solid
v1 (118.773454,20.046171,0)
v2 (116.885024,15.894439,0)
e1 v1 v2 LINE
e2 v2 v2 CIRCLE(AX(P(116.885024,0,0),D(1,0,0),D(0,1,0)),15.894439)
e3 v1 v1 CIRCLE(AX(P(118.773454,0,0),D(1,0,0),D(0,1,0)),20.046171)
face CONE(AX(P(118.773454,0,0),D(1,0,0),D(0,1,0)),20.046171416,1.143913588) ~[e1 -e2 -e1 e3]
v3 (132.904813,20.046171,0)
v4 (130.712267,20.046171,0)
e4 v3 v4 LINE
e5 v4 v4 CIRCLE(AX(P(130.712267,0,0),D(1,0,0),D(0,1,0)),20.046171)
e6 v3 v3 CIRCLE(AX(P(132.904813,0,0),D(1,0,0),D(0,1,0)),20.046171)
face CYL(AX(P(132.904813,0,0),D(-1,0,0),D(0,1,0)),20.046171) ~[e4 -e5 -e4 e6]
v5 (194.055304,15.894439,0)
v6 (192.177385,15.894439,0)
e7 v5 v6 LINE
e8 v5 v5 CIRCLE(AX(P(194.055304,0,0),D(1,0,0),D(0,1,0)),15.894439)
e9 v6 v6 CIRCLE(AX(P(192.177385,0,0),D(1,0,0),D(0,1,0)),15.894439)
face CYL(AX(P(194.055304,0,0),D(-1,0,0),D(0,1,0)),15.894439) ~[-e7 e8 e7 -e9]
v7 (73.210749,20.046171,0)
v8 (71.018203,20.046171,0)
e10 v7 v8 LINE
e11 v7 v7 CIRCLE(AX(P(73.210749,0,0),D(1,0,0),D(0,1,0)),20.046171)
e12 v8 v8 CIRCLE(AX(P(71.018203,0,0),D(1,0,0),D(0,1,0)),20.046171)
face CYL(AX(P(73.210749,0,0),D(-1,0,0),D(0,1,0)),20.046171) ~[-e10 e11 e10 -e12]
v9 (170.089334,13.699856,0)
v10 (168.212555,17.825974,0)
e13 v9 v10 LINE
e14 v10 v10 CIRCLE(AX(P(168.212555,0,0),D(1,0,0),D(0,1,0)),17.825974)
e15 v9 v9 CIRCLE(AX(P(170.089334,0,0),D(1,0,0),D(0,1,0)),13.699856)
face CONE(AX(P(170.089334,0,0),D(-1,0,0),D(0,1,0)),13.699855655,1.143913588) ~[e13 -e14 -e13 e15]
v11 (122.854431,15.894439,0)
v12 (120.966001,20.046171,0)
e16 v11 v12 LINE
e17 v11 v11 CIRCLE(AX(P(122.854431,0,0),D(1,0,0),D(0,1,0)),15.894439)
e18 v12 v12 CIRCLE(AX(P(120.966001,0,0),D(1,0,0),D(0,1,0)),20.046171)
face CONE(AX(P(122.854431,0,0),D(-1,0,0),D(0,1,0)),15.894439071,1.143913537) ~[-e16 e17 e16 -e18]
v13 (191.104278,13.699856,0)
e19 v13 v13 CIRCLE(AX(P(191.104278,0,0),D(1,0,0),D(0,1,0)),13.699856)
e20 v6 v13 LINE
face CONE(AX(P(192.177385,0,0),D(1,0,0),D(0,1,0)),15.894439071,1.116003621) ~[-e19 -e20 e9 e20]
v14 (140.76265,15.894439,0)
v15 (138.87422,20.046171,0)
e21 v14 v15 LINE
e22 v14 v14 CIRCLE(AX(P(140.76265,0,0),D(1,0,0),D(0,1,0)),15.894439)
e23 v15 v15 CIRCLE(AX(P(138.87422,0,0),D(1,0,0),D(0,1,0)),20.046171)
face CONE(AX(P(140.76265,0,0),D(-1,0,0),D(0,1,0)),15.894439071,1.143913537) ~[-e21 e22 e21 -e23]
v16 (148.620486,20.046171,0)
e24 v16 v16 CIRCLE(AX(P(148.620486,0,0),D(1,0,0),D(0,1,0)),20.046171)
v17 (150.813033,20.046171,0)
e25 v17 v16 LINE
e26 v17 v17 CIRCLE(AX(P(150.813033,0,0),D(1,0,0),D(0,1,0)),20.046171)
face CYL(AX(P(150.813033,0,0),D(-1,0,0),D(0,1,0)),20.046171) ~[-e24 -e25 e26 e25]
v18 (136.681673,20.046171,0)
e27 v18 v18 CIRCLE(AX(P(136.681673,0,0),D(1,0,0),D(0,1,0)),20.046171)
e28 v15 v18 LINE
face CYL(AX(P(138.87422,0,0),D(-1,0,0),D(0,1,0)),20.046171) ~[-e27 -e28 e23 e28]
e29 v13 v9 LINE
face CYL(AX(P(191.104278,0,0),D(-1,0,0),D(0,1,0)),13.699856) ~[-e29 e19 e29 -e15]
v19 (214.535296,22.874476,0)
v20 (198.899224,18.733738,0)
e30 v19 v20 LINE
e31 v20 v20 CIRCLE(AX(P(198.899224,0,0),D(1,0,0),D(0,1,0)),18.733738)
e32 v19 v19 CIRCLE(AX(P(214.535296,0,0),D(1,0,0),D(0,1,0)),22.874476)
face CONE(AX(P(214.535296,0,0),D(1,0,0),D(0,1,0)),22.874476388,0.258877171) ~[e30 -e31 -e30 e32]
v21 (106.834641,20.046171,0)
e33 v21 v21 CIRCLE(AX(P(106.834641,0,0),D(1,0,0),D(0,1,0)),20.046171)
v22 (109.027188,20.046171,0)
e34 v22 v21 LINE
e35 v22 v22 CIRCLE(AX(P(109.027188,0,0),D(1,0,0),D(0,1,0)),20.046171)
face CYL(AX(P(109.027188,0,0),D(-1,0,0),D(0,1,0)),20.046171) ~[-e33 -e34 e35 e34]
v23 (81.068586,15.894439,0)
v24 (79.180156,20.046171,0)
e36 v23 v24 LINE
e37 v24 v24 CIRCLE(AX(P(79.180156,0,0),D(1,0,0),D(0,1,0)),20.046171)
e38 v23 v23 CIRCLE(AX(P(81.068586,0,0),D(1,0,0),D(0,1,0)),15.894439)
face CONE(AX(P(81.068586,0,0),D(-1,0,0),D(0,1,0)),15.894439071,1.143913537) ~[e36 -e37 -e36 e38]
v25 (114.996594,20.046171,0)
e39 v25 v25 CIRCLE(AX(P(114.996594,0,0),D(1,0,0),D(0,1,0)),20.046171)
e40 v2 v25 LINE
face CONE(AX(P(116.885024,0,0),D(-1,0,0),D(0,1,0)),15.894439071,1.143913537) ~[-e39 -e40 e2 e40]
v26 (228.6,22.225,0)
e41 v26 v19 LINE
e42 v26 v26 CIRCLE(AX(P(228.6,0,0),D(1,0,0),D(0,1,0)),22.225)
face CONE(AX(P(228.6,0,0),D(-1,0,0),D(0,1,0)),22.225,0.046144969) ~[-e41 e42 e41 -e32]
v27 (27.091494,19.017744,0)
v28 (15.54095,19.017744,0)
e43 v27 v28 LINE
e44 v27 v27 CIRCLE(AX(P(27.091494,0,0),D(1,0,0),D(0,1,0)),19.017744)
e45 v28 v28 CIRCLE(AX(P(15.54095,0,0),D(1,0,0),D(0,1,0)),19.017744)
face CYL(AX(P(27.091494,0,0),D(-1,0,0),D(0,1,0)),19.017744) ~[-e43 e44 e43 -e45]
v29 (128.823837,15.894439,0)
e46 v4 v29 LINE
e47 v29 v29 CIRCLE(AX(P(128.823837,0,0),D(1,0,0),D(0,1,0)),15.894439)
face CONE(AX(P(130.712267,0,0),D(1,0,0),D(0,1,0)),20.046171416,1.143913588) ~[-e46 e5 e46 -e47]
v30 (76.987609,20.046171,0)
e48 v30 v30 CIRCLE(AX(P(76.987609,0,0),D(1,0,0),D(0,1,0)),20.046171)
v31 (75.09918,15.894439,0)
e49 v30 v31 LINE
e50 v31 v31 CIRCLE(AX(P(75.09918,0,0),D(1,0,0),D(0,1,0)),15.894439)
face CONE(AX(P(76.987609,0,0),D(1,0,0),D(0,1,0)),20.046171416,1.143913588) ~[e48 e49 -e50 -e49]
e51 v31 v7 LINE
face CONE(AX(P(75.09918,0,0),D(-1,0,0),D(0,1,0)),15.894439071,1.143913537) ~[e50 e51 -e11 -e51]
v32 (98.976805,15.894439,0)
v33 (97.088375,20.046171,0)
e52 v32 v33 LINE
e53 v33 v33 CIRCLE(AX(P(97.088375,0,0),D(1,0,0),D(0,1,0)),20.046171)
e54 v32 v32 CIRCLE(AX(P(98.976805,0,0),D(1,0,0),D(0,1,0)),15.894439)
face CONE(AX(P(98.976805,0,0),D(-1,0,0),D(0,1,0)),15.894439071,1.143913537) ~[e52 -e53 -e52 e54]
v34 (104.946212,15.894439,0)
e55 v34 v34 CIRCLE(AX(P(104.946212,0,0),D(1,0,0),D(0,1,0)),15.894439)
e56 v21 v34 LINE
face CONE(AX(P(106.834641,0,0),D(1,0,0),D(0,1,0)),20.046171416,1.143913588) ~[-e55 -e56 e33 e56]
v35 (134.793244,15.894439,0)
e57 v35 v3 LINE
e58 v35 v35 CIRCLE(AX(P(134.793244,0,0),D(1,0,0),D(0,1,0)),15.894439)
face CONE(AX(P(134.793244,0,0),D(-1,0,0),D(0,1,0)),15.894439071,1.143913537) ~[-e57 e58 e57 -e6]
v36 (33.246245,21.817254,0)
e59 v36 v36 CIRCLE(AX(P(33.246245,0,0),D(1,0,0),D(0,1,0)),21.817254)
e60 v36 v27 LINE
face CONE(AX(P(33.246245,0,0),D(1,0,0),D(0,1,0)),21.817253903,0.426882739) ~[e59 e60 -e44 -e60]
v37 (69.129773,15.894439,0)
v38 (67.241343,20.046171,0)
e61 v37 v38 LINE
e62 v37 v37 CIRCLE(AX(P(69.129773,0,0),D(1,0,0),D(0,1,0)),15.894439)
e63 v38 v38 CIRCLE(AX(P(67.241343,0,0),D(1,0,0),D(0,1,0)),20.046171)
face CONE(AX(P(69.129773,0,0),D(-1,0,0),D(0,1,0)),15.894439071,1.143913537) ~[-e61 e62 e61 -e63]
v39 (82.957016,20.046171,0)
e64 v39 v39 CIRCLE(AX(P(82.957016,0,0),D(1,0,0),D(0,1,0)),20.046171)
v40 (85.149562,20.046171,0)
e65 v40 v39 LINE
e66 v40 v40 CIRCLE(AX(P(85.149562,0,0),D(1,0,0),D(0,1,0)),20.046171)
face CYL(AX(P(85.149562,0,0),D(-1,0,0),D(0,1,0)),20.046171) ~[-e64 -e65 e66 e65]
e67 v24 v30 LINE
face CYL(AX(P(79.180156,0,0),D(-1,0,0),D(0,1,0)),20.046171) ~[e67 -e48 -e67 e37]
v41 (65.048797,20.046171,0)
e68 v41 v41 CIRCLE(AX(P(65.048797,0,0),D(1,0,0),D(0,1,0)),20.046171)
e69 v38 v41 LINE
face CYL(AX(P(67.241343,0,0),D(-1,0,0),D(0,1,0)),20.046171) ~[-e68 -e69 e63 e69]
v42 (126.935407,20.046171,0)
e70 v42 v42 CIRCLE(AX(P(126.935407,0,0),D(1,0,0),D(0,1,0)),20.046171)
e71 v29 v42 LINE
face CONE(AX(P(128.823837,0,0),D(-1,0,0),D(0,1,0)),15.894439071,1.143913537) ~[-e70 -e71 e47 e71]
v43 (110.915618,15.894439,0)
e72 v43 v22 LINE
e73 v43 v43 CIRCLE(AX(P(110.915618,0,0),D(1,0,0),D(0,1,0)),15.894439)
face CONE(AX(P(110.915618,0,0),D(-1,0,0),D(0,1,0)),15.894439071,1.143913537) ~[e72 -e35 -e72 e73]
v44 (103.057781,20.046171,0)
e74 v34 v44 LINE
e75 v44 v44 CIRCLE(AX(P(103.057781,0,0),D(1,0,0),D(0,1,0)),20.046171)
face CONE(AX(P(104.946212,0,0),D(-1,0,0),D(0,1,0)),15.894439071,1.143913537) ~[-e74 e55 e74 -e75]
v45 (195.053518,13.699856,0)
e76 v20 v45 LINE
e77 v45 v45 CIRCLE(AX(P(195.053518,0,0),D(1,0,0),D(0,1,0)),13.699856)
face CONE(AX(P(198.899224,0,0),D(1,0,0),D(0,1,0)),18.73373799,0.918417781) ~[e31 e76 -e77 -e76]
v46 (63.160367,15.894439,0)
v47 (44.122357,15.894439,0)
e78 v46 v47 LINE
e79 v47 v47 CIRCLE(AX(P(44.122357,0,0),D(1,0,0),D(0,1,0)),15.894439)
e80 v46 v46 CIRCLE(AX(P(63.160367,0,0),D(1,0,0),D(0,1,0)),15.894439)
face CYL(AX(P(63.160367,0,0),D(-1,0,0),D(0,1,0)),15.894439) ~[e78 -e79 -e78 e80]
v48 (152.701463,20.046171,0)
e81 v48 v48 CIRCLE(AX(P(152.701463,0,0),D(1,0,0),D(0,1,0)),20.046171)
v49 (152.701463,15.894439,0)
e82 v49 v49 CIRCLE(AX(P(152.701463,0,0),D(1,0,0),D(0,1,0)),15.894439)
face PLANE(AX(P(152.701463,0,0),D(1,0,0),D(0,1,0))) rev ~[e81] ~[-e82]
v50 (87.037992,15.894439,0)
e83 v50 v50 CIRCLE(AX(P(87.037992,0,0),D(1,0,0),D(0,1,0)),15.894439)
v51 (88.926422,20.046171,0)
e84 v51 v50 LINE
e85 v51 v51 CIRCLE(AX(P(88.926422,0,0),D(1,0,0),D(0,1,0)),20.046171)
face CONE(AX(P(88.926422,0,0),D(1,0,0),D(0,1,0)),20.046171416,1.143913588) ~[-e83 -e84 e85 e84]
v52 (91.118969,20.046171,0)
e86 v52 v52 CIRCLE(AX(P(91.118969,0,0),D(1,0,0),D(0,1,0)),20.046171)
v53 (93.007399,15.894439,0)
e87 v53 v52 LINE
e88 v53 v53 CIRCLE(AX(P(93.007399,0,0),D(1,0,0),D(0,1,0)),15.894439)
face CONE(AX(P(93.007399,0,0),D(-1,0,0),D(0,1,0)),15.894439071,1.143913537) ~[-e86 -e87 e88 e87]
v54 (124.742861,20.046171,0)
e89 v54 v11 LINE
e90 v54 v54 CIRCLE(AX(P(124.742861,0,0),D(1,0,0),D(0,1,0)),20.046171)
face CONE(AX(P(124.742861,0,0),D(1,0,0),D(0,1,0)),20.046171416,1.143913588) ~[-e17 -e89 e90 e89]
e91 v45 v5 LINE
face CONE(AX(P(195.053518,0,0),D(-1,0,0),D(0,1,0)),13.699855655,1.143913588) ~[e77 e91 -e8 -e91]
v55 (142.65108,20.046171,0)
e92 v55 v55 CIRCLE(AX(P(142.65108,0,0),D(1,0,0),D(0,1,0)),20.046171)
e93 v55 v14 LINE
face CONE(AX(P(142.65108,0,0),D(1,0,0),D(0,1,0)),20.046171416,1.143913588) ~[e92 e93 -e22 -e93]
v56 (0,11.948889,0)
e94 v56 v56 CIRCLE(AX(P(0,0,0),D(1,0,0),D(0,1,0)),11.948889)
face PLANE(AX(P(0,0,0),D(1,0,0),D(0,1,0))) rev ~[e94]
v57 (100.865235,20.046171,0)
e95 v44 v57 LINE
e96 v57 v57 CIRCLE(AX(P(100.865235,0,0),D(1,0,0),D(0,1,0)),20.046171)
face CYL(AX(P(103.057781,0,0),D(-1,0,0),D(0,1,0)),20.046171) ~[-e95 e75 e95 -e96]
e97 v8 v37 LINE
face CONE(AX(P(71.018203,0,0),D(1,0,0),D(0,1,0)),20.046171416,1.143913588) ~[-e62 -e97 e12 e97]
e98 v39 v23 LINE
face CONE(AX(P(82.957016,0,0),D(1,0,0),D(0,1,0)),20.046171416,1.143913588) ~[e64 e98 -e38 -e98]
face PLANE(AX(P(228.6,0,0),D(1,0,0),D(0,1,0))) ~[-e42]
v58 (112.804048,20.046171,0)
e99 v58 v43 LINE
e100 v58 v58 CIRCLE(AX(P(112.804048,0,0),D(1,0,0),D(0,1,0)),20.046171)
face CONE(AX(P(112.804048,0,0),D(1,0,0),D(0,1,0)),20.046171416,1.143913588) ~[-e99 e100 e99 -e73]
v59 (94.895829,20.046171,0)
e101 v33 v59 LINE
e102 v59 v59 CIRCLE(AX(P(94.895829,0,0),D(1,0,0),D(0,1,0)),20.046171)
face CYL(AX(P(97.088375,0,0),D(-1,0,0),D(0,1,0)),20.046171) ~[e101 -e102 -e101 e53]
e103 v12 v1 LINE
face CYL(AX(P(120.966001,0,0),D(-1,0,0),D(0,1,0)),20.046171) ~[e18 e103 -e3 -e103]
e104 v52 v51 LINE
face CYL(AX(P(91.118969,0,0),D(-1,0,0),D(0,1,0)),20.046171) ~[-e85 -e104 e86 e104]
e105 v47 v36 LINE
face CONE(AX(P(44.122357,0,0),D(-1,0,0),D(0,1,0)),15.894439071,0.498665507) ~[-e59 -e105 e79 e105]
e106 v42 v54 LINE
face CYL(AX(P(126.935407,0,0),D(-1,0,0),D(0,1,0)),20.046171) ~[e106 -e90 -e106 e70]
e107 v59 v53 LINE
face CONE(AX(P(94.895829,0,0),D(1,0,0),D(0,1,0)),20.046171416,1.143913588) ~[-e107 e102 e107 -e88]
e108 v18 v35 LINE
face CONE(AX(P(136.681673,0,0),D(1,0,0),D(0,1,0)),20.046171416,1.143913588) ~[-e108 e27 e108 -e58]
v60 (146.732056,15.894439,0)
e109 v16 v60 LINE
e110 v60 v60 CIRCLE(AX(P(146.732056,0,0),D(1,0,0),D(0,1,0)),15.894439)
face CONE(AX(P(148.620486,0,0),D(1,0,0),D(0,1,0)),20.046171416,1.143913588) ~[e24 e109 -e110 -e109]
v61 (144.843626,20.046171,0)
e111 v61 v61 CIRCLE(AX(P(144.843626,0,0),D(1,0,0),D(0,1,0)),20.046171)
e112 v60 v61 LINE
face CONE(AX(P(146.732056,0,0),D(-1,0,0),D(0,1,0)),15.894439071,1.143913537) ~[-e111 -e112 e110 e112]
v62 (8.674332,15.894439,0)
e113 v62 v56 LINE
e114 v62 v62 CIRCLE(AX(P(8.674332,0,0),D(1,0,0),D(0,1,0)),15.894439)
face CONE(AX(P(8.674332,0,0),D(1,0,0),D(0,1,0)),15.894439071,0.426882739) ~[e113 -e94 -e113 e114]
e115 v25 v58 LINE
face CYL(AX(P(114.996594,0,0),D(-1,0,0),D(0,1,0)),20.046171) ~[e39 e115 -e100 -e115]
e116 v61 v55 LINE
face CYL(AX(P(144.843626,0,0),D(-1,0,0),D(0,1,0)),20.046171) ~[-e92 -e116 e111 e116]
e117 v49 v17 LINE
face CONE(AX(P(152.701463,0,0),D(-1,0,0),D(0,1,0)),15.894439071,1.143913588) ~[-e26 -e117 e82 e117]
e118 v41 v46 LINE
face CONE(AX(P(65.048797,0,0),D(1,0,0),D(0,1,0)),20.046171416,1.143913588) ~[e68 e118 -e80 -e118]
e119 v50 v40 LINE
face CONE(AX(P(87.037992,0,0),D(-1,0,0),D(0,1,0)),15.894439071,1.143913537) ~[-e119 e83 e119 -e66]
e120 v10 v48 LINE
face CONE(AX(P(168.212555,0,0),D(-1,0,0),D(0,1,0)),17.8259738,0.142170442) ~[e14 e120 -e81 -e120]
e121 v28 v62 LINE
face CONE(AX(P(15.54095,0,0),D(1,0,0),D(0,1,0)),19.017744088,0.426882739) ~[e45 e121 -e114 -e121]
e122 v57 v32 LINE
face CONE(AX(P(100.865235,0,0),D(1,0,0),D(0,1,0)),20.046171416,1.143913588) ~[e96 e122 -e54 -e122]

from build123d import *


# Not quite as in the source:
# - ends of sketch curves that miss each other by under 0.0002 mm in the source are joined


with BuildPart() as f1:
    # F0 (on Top) → F1 (revolve)
    with BuildSketch(Plane.XY):
        Polygon((146.7320563859, 15.8944390714), (152.7014625293, 15.8944390714), (150.8130326557, 20.0461714163), (149.7167594576, 20.0461714163), (148.6204862595, 20.0461714163), align=None)
        Polygon((0, 11.9488890163), (0, 0), (228.6, 0), (228.6, 22.225), (214.5352959633, 22.8744763881), (198.8992244005, 18.7337379903), (195.0535178185, 13.6998556554), (194.0553039312, 15.8944390714), (192.1773850918, 15.8944390714), (191.1042779684, 13.6998556554), (170.0893342495, 13.6998556554), (168.2125550841, 17.8259737997), (152.7014625293, 20.0461714163), (152.7014625293, 15.8944390714), (146.7320563859, 15.8944390714), (144.8436262557, 20.0461714163), (142.6510798595, 20.0461714163), (140.7626499859, 15.8944390714), (138.8742198557, 20.0461714163), (136.6816734595, 20.0461714163), (134.7932435859, 15.8944390714), (132.9048134557, 20.0461714163), (130.7122670595, 20.0461714163), (128.8238371859, 15.8944390714), (126.9354070557, 20.0461714163), (124.7428606595, 20.0461714163), (122.8544307859, 15.8944390714), (120.9660006557, 20.0461714163), (118.7734542595, 20.0461714163), (116.8850243859, 15.8944390714), (114.9965942557, 20.0461714163), (112.8040478595, 20.0461714163), (110.9156179859, 15.8944390714), (109.0271878557, 20.0461714163), (106.8346414595, 20.0461714163), (104.9462115859, 15.8944390714), (103.0577814557, 20.0461714163), (100.8652350595, 20.0461714163), (98.9768051859, 15.8944390714), (97.0883750557, 20.0461714163), (94.8958286595, 20.0461714163), (93.0073987859, 15.8944390714), (91.1189686557, 20.0461714163), (88.9264222595, 20.0461714163), (87.0379923859, 15.8944390714), (85.1495622557, 20.0461714163), (82.9570158595, 20.0461714163), (81.0685859859, 15.8944390714), (79.1801558557, 20.0461714163), (76.9876094595, 20.0461714163), (75.0991795859, 15.8944390714), (73.2107494557, 20.0461714163), (71.0182030595, 20.0461714163), (69.1297731859, 15.8944390714), (67.2413430557, 20.0461714163), (65.0487966595, 20.0461714163), (63.1603667859, 15.8944390714), (44.1223569214, 15.8944390714), (33.2462452351, 21.8172539027), (27.0914943445, 19.0177440883), (15.54095, 19.0177440883), (8.674332053, 15.8944390714), align=None)
    revolve(axis=Axis((114.3, 0, 0), (1, 0, 0)))


solid = f1.part
